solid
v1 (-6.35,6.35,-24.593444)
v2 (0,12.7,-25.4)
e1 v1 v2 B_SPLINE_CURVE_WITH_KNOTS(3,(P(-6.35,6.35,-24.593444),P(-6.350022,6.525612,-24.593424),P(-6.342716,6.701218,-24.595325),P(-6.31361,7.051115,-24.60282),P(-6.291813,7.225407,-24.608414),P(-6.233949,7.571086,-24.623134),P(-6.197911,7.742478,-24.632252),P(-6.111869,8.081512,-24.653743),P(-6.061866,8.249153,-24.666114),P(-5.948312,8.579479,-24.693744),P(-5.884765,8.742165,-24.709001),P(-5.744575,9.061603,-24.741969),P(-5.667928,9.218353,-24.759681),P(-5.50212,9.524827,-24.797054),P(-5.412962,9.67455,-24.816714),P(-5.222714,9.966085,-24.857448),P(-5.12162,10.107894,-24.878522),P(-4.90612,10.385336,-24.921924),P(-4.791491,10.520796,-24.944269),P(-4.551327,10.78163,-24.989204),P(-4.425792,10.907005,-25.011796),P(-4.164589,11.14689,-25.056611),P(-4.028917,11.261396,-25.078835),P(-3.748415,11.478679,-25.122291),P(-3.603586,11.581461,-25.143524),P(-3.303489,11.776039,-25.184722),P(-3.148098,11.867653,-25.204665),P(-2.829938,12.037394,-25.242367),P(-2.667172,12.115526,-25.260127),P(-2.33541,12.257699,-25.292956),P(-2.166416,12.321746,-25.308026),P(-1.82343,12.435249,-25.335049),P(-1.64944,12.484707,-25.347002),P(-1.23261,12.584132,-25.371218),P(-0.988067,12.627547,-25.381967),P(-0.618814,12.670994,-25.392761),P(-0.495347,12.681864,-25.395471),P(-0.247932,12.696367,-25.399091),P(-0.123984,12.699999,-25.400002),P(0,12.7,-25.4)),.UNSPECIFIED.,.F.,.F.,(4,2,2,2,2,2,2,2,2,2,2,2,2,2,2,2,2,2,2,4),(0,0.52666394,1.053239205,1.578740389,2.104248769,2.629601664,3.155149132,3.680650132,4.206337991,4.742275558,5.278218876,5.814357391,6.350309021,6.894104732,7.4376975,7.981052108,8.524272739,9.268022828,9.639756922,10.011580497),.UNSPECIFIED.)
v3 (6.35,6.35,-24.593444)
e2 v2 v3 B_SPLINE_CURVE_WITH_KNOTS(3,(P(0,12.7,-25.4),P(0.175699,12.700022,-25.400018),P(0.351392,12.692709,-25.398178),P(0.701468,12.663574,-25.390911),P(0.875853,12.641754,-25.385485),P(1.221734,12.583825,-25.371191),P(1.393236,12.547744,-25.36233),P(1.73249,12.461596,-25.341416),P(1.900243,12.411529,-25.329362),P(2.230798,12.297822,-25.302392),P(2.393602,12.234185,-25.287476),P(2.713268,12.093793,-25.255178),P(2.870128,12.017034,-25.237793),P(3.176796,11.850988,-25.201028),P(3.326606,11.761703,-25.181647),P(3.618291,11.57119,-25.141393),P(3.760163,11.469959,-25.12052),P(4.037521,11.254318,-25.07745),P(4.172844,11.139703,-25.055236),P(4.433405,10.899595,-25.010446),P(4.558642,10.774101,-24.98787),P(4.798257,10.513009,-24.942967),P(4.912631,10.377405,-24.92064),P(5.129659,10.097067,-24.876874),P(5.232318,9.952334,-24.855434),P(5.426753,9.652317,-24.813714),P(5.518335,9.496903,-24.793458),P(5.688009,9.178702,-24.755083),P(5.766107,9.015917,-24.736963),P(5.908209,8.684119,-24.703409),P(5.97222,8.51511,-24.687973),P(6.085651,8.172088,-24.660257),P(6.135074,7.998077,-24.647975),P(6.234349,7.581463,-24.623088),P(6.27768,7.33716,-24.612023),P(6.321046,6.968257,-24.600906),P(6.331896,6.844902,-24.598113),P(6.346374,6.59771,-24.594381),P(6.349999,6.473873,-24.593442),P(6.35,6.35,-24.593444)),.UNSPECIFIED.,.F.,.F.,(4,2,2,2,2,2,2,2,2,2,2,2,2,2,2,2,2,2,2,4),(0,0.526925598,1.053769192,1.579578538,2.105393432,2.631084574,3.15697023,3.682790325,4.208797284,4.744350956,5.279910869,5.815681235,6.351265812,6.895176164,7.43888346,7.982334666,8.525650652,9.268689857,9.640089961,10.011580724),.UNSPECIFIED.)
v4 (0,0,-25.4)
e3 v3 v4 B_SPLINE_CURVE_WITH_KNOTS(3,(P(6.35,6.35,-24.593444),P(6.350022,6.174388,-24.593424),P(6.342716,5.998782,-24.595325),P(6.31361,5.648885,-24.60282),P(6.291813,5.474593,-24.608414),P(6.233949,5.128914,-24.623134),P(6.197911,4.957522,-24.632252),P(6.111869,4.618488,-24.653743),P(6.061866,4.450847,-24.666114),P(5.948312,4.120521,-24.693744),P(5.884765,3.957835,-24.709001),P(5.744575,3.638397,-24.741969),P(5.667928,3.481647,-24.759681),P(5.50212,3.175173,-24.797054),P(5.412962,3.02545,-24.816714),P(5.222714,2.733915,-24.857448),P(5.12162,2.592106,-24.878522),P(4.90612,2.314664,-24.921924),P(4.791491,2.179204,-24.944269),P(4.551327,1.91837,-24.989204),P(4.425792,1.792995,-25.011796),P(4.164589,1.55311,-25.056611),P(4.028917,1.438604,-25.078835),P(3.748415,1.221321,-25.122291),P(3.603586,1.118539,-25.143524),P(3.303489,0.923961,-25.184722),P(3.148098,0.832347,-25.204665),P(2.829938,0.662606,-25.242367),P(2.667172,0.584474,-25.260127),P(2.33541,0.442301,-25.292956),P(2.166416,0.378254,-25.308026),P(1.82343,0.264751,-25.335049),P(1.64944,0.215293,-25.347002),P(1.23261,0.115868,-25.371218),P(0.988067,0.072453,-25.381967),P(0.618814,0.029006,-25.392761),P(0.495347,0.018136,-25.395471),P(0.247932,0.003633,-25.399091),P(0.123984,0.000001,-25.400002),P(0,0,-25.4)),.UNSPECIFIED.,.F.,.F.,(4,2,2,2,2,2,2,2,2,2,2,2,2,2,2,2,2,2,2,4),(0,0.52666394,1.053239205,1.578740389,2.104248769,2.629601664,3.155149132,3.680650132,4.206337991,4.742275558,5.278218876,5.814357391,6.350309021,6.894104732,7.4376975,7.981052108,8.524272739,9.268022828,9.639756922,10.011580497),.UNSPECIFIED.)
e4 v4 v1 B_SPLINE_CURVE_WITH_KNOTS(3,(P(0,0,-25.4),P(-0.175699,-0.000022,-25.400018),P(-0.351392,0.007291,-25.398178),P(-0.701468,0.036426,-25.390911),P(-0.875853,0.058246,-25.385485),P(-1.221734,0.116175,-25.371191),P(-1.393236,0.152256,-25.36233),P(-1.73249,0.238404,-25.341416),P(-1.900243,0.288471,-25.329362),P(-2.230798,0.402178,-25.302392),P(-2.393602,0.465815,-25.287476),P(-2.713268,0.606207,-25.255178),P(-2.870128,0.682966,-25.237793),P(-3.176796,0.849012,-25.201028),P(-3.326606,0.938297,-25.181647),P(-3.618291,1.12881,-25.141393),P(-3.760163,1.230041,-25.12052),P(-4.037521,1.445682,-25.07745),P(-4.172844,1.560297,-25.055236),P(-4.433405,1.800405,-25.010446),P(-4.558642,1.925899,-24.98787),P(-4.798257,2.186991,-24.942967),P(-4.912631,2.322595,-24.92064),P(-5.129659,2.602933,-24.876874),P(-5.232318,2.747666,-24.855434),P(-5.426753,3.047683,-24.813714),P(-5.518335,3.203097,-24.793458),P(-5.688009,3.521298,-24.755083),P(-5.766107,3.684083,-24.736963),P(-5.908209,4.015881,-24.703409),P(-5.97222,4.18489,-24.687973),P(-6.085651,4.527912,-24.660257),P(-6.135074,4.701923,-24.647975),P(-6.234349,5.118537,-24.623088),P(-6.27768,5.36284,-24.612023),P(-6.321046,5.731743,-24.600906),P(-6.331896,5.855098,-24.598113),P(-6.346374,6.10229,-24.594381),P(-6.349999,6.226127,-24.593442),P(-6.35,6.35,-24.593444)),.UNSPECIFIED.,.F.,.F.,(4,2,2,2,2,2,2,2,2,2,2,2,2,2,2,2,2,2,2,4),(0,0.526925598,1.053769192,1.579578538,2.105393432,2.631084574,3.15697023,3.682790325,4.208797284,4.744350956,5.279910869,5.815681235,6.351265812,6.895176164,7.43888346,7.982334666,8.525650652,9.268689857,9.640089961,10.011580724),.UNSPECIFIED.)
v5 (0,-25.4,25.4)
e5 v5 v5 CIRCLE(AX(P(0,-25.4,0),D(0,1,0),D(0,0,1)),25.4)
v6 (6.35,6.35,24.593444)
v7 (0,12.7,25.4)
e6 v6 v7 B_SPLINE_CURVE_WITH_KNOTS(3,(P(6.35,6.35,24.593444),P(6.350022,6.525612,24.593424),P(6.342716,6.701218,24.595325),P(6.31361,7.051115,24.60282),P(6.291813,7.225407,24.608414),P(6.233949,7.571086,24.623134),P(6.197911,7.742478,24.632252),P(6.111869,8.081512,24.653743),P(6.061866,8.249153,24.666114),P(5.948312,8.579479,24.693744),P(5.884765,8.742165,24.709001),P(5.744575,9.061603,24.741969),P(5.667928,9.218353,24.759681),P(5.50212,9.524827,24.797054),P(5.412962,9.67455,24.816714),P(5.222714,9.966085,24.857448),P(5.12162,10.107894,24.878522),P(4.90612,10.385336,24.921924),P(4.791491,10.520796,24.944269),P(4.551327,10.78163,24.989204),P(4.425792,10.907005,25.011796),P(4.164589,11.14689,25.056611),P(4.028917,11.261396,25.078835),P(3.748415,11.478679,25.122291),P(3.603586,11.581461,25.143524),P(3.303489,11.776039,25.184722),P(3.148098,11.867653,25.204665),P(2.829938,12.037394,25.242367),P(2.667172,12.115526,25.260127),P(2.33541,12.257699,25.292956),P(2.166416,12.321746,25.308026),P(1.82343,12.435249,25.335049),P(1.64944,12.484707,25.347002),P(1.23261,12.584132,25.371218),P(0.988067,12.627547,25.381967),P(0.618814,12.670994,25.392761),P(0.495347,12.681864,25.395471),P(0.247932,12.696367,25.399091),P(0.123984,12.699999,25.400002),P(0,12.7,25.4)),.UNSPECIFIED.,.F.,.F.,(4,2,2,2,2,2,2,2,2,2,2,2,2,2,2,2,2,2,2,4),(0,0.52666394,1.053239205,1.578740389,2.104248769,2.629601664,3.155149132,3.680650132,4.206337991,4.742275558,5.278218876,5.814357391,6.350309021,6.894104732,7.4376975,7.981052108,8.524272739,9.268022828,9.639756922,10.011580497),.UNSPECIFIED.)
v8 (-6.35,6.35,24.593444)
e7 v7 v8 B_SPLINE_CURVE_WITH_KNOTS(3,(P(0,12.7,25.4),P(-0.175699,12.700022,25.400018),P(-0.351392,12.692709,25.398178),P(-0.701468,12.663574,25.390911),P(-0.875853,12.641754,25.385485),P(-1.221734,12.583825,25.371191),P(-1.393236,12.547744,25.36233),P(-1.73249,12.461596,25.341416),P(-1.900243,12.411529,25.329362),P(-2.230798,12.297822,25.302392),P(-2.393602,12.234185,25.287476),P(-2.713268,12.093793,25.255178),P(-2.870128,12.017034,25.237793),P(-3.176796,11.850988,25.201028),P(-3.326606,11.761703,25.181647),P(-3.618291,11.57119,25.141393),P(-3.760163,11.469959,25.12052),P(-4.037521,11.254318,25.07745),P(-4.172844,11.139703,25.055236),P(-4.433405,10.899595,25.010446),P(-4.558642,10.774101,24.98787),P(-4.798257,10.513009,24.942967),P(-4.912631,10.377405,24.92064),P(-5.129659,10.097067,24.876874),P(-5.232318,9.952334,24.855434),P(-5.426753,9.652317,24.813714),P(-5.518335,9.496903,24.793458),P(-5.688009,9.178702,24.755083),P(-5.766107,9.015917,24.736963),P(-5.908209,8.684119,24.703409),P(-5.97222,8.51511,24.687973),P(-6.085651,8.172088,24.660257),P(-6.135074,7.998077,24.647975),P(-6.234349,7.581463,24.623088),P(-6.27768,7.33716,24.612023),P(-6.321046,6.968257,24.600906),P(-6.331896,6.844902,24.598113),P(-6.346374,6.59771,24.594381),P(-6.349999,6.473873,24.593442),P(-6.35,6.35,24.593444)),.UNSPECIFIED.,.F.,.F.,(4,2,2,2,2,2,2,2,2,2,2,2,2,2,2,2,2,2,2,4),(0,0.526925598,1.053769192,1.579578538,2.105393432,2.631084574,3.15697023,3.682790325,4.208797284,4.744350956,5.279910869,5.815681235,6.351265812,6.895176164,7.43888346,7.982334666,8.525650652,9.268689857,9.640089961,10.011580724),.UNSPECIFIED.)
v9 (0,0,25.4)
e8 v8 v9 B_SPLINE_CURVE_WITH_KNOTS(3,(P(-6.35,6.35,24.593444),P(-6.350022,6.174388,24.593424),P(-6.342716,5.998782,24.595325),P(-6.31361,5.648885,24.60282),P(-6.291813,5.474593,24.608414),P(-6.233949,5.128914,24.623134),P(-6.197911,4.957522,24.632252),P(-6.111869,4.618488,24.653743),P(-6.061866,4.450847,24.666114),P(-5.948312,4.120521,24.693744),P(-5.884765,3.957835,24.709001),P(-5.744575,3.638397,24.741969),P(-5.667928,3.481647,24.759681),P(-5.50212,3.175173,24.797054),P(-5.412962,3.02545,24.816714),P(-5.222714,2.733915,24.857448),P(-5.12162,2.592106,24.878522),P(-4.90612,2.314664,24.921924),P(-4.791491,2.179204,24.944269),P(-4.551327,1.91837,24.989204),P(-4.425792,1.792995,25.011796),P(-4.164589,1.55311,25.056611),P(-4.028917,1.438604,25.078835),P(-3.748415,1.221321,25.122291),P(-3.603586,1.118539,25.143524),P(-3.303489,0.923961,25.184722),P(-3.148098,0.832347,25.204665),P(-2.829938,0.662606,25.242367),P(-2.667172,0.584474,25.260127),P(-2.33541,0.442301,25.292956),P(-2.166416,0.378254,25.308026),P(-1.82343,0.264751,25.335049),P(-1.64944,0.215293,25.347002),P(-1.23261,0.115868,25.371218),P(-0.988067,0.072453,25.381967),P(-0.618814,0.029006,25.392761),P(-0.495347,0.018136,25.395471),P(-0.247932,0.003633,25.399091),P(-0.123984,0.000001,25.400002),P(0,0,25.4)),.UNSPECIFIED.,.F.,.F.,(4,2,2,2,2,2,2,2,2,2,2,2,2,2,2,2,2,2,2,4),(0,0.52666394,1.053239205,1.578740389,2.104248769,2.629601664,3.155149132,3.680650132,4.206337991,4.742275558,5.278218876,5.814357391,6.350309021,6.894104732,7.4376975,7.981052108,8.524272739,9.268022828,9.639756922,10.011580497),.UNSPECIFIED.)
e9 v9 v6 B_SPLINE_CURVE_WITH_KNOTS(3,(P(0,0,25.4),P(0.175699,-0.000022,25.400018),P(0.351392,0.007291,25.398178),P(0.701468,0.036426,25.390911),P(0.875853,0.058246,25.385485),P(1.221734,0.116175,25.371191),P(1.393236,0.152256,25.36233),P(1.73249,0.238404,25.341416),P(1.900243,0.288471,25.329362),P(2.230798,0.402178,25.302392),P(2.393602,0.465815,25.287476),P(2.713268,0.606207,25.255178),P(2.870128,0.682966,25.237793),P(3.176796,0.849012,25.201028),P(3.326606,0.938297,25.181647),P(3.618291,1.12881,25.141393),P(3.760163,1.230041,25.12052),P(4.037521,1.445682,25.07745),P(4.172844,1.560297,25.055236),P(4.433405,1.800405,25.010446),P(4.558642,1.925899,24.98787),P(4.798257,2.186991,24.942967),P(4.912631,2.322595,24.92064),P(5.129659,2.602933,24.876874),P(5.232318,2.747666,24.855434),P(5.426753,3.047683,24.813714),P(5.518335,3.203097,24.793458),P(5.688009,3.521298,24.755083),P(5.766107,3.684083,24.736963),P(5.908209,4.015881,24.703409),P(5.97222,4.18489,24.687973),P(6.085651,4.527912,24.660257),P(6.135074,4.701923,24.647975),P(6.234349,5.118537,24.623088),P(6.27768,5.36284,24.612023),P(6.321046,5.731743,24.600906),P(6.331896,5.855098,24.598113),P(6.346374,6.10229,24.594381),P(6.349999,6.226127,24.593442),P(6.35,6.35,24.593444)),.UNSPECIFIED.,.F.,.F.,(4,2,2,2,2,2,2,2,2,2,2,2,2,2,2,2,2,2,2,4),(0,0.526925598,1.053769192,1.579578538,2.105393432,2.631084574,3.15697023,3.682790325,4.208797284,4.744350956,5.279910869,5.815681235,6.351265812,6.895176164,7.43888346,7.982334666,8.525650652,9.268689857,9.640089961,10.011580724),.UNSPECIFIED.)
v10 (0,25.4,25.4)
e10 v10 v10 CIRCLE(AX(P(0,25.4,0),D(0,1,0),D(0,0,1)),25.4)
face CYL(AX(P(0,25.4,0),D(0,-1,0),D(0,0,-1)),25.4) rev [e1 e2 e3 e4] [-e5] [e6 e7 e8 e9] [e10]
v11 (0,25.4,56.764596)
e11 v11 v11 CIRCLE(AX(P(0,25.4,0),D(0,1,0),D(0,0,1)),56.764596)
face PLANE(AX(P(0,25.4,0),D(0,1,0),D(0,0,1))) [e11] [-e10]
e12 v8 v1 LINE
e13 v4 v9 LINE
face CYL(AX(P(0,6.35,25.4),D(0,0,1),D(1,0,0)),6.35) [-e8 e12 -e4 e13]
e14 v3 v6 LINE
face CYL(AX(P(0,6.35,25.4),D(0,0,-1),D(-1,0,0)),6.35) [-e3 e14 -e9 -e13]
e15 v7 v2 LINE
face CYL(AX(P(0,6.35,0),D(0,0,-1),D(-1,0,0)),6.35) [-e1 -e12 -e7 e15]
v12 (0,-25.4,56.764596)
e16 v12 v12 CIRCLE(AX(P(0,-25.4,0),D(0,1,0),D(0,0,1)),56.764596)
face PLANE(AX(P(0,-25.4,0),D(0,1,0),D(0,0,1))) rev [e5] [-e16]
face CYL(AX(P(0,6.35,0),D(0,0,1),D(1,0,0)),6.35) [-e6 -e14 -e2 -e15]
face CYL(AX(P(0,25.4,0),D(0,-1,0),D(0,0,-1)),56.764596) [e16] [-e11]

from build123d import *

# Parameters (mm, degrees)
SKETCH1_R               = 56.764595508
BOSS_EXTRUDE1_DEPTH     = 25.4
CUT_EXTRUDE1_DEPTH      = 85.199754194
CUT_EXTRUDE1_DEPTH_BACK = 85.199754194
SKETCH3_R               = 25.4
SKETCH4_W               = 12.7
SKETCH4_H               = 50.8
BOSS_EXTRUDE2_DEPTH     = 12.7
FILLET1_R               = 6.35


with BuildPart() as part:
    # Sketch1 → Boss-Extrude1 (new, symmetric)
    with BuildSketch(Plane(origin=(0, 0, 0), x_dir=(1, 0, 0), z_dir=(0, 1, 0))):
        with Locations(Location((0, 0, 0), (0, 0, 270))):
            Circle(SKETCH1_R)
    extrude(amount=BOSS_EXTRUDE1_DEPTH, both=True)

    # Sketch3 → Cut-Extrude1 (cut, two sides: drawn at the far end of the back side and taken through both)
    with BuildSketch(Plane(origin=(0, 0, 0), x_dir=(1, 0, 0), z_dir=(0, 1, 0)).offset(-CUT_EXTRUDE1_DEPTH_BACK)):
        with Locations(Location((0, 0, 0), (0, 0, 270))):
            Circle(SKETCH3_R)
    extrude(amount=CUT_EXTRUDE1_DEPTH + CUT_EXTRUDE1_DEPTH_BACK, mode=Mode.SUBTRACT)

    # Sketch4 → Boss-Extrude2 (add)
    with BuildSketch(Plane(origin=(0, 0, 0), x_dir=(1, 0, 0), z_dir=(0, 1, 0))):
        Rectangle(SKETCH4_W, SKETCH4_H)
    extrude(amount=BOSS_EXTRUDE2_DEPTH)

    # Fillet1
    # the kernel refuses this fillet: 6.35 mm, written as the material it takes off along each edge
    with BuildSketch(Plane(origin=(-6.35, 0, 40.468444248), x_dir=(0, 1, 0), z_dir=(0, 0, -1))) as fillet1_piece_1_section:
        with BuildLine():
            CenterArc((FILLET1_R, FILLET1_R), FILLET1_R, 180, 90)
            Line((0, FILLET1_R), (0, 0))
            Line((0, 0), (FILLET1_R, 0))
        make_face()
    fillet1_piece_1 = extrude(amount=80.936888497, mode=Mode.PRIVATE)
    fillet1_piece_1 = fillet1_piece_1 & Plane(origin=(0, 1.429605244, 0), x_dir=(0, 0, 1), z_dir=(0, 1, 0)) * Cylinder(25.4, 188, mode=Mode.PRIVATE)
    with BuildSketch(Plane(origin=(-6.35, 12.7, 40.468444248), x_dir=(1, 0, 0), z_dir=(0, 0, -1))) as fillet1_piece_2_section:
        with BuildLine():
            CenterArc((FILLET1_R, FILLET1_R), FILLET1_R, 180, 90)
            Line((0, FILLET1_R), (0, 0))
            Line((0, 0), (FILLET1_R, 0))
        make_face()
    fillet1_piece_2 = extrude(amount=80.936888497, mode=Mode.PRIVATE)
    fillet1_piece_2 = fillet1_piece_2 & Plane(origin=(0, 11.270396349, 0), x_dir=(0, 0, 1), z_dir=(0, 1, 0)) * Cylinder(25.4, 188, mode=Mode.PRIVATE)
    with BuildSketch(Plane(origin=(6.35, 0, -40.468444248), x_dir=(0, 1, 0), z_dir=(0, 0, 1))) as fillet1_piece_3_section:
        with BuildLine():
            CenterArc((FILLET1_R, FILLET1_R), FILLET1_R, 180, 90)
            Line((0, FILLET1_R), (0, 0))
            Line((0, 0), (FILLET1_R, 0))
        make_face()
    fillet1_piece_3 = extrude(amount=80.936888497, mode=Mode.PRIVATE)
    fillet1_piece_3 = fillet1_piece_3 & Plane(origin=(0, 1.429603632, 0), x_dir=(0, 0, 1), z_dir=(0, 1, 0)) * Cylinder(25.4, 188, mode=Mode.PRIVATE)
    with BuildSketch(Plane(origin=(6.35, 12.7, -40.468444248), x_dir=(0, -1, 0), z_dir=(0, 0, 1))) as fillet1_piece_4_section:
        with BuildLine():
            CenterArc((FILLET1_R, -FILLET1_R), FILLET1_R, 90, 90)
            Line((0, -FILLET1_R), (0, 0))
            Line((0, 0), (FILLET1_R, 0))
        make_face()
    fillet1_piece_4 = extrude(amount=80.936888497, mode=Mode.PRIVATE)
    fillet1_piece_4 = fillet1_piece_4 & Plane(origin=(0, 11.270396368, 0), x_dir=(0, 0, 1), z_dir=(0, 1, 0)) * Cylinder(25.4, 188, mode=Mode.PRIVATE)
    add([fillet1_piece_1, fillet1_piece_2, fillet1_piece_3, fillet1_piece_4], mode=Mode.SUBTRACT)


solid = part.part
